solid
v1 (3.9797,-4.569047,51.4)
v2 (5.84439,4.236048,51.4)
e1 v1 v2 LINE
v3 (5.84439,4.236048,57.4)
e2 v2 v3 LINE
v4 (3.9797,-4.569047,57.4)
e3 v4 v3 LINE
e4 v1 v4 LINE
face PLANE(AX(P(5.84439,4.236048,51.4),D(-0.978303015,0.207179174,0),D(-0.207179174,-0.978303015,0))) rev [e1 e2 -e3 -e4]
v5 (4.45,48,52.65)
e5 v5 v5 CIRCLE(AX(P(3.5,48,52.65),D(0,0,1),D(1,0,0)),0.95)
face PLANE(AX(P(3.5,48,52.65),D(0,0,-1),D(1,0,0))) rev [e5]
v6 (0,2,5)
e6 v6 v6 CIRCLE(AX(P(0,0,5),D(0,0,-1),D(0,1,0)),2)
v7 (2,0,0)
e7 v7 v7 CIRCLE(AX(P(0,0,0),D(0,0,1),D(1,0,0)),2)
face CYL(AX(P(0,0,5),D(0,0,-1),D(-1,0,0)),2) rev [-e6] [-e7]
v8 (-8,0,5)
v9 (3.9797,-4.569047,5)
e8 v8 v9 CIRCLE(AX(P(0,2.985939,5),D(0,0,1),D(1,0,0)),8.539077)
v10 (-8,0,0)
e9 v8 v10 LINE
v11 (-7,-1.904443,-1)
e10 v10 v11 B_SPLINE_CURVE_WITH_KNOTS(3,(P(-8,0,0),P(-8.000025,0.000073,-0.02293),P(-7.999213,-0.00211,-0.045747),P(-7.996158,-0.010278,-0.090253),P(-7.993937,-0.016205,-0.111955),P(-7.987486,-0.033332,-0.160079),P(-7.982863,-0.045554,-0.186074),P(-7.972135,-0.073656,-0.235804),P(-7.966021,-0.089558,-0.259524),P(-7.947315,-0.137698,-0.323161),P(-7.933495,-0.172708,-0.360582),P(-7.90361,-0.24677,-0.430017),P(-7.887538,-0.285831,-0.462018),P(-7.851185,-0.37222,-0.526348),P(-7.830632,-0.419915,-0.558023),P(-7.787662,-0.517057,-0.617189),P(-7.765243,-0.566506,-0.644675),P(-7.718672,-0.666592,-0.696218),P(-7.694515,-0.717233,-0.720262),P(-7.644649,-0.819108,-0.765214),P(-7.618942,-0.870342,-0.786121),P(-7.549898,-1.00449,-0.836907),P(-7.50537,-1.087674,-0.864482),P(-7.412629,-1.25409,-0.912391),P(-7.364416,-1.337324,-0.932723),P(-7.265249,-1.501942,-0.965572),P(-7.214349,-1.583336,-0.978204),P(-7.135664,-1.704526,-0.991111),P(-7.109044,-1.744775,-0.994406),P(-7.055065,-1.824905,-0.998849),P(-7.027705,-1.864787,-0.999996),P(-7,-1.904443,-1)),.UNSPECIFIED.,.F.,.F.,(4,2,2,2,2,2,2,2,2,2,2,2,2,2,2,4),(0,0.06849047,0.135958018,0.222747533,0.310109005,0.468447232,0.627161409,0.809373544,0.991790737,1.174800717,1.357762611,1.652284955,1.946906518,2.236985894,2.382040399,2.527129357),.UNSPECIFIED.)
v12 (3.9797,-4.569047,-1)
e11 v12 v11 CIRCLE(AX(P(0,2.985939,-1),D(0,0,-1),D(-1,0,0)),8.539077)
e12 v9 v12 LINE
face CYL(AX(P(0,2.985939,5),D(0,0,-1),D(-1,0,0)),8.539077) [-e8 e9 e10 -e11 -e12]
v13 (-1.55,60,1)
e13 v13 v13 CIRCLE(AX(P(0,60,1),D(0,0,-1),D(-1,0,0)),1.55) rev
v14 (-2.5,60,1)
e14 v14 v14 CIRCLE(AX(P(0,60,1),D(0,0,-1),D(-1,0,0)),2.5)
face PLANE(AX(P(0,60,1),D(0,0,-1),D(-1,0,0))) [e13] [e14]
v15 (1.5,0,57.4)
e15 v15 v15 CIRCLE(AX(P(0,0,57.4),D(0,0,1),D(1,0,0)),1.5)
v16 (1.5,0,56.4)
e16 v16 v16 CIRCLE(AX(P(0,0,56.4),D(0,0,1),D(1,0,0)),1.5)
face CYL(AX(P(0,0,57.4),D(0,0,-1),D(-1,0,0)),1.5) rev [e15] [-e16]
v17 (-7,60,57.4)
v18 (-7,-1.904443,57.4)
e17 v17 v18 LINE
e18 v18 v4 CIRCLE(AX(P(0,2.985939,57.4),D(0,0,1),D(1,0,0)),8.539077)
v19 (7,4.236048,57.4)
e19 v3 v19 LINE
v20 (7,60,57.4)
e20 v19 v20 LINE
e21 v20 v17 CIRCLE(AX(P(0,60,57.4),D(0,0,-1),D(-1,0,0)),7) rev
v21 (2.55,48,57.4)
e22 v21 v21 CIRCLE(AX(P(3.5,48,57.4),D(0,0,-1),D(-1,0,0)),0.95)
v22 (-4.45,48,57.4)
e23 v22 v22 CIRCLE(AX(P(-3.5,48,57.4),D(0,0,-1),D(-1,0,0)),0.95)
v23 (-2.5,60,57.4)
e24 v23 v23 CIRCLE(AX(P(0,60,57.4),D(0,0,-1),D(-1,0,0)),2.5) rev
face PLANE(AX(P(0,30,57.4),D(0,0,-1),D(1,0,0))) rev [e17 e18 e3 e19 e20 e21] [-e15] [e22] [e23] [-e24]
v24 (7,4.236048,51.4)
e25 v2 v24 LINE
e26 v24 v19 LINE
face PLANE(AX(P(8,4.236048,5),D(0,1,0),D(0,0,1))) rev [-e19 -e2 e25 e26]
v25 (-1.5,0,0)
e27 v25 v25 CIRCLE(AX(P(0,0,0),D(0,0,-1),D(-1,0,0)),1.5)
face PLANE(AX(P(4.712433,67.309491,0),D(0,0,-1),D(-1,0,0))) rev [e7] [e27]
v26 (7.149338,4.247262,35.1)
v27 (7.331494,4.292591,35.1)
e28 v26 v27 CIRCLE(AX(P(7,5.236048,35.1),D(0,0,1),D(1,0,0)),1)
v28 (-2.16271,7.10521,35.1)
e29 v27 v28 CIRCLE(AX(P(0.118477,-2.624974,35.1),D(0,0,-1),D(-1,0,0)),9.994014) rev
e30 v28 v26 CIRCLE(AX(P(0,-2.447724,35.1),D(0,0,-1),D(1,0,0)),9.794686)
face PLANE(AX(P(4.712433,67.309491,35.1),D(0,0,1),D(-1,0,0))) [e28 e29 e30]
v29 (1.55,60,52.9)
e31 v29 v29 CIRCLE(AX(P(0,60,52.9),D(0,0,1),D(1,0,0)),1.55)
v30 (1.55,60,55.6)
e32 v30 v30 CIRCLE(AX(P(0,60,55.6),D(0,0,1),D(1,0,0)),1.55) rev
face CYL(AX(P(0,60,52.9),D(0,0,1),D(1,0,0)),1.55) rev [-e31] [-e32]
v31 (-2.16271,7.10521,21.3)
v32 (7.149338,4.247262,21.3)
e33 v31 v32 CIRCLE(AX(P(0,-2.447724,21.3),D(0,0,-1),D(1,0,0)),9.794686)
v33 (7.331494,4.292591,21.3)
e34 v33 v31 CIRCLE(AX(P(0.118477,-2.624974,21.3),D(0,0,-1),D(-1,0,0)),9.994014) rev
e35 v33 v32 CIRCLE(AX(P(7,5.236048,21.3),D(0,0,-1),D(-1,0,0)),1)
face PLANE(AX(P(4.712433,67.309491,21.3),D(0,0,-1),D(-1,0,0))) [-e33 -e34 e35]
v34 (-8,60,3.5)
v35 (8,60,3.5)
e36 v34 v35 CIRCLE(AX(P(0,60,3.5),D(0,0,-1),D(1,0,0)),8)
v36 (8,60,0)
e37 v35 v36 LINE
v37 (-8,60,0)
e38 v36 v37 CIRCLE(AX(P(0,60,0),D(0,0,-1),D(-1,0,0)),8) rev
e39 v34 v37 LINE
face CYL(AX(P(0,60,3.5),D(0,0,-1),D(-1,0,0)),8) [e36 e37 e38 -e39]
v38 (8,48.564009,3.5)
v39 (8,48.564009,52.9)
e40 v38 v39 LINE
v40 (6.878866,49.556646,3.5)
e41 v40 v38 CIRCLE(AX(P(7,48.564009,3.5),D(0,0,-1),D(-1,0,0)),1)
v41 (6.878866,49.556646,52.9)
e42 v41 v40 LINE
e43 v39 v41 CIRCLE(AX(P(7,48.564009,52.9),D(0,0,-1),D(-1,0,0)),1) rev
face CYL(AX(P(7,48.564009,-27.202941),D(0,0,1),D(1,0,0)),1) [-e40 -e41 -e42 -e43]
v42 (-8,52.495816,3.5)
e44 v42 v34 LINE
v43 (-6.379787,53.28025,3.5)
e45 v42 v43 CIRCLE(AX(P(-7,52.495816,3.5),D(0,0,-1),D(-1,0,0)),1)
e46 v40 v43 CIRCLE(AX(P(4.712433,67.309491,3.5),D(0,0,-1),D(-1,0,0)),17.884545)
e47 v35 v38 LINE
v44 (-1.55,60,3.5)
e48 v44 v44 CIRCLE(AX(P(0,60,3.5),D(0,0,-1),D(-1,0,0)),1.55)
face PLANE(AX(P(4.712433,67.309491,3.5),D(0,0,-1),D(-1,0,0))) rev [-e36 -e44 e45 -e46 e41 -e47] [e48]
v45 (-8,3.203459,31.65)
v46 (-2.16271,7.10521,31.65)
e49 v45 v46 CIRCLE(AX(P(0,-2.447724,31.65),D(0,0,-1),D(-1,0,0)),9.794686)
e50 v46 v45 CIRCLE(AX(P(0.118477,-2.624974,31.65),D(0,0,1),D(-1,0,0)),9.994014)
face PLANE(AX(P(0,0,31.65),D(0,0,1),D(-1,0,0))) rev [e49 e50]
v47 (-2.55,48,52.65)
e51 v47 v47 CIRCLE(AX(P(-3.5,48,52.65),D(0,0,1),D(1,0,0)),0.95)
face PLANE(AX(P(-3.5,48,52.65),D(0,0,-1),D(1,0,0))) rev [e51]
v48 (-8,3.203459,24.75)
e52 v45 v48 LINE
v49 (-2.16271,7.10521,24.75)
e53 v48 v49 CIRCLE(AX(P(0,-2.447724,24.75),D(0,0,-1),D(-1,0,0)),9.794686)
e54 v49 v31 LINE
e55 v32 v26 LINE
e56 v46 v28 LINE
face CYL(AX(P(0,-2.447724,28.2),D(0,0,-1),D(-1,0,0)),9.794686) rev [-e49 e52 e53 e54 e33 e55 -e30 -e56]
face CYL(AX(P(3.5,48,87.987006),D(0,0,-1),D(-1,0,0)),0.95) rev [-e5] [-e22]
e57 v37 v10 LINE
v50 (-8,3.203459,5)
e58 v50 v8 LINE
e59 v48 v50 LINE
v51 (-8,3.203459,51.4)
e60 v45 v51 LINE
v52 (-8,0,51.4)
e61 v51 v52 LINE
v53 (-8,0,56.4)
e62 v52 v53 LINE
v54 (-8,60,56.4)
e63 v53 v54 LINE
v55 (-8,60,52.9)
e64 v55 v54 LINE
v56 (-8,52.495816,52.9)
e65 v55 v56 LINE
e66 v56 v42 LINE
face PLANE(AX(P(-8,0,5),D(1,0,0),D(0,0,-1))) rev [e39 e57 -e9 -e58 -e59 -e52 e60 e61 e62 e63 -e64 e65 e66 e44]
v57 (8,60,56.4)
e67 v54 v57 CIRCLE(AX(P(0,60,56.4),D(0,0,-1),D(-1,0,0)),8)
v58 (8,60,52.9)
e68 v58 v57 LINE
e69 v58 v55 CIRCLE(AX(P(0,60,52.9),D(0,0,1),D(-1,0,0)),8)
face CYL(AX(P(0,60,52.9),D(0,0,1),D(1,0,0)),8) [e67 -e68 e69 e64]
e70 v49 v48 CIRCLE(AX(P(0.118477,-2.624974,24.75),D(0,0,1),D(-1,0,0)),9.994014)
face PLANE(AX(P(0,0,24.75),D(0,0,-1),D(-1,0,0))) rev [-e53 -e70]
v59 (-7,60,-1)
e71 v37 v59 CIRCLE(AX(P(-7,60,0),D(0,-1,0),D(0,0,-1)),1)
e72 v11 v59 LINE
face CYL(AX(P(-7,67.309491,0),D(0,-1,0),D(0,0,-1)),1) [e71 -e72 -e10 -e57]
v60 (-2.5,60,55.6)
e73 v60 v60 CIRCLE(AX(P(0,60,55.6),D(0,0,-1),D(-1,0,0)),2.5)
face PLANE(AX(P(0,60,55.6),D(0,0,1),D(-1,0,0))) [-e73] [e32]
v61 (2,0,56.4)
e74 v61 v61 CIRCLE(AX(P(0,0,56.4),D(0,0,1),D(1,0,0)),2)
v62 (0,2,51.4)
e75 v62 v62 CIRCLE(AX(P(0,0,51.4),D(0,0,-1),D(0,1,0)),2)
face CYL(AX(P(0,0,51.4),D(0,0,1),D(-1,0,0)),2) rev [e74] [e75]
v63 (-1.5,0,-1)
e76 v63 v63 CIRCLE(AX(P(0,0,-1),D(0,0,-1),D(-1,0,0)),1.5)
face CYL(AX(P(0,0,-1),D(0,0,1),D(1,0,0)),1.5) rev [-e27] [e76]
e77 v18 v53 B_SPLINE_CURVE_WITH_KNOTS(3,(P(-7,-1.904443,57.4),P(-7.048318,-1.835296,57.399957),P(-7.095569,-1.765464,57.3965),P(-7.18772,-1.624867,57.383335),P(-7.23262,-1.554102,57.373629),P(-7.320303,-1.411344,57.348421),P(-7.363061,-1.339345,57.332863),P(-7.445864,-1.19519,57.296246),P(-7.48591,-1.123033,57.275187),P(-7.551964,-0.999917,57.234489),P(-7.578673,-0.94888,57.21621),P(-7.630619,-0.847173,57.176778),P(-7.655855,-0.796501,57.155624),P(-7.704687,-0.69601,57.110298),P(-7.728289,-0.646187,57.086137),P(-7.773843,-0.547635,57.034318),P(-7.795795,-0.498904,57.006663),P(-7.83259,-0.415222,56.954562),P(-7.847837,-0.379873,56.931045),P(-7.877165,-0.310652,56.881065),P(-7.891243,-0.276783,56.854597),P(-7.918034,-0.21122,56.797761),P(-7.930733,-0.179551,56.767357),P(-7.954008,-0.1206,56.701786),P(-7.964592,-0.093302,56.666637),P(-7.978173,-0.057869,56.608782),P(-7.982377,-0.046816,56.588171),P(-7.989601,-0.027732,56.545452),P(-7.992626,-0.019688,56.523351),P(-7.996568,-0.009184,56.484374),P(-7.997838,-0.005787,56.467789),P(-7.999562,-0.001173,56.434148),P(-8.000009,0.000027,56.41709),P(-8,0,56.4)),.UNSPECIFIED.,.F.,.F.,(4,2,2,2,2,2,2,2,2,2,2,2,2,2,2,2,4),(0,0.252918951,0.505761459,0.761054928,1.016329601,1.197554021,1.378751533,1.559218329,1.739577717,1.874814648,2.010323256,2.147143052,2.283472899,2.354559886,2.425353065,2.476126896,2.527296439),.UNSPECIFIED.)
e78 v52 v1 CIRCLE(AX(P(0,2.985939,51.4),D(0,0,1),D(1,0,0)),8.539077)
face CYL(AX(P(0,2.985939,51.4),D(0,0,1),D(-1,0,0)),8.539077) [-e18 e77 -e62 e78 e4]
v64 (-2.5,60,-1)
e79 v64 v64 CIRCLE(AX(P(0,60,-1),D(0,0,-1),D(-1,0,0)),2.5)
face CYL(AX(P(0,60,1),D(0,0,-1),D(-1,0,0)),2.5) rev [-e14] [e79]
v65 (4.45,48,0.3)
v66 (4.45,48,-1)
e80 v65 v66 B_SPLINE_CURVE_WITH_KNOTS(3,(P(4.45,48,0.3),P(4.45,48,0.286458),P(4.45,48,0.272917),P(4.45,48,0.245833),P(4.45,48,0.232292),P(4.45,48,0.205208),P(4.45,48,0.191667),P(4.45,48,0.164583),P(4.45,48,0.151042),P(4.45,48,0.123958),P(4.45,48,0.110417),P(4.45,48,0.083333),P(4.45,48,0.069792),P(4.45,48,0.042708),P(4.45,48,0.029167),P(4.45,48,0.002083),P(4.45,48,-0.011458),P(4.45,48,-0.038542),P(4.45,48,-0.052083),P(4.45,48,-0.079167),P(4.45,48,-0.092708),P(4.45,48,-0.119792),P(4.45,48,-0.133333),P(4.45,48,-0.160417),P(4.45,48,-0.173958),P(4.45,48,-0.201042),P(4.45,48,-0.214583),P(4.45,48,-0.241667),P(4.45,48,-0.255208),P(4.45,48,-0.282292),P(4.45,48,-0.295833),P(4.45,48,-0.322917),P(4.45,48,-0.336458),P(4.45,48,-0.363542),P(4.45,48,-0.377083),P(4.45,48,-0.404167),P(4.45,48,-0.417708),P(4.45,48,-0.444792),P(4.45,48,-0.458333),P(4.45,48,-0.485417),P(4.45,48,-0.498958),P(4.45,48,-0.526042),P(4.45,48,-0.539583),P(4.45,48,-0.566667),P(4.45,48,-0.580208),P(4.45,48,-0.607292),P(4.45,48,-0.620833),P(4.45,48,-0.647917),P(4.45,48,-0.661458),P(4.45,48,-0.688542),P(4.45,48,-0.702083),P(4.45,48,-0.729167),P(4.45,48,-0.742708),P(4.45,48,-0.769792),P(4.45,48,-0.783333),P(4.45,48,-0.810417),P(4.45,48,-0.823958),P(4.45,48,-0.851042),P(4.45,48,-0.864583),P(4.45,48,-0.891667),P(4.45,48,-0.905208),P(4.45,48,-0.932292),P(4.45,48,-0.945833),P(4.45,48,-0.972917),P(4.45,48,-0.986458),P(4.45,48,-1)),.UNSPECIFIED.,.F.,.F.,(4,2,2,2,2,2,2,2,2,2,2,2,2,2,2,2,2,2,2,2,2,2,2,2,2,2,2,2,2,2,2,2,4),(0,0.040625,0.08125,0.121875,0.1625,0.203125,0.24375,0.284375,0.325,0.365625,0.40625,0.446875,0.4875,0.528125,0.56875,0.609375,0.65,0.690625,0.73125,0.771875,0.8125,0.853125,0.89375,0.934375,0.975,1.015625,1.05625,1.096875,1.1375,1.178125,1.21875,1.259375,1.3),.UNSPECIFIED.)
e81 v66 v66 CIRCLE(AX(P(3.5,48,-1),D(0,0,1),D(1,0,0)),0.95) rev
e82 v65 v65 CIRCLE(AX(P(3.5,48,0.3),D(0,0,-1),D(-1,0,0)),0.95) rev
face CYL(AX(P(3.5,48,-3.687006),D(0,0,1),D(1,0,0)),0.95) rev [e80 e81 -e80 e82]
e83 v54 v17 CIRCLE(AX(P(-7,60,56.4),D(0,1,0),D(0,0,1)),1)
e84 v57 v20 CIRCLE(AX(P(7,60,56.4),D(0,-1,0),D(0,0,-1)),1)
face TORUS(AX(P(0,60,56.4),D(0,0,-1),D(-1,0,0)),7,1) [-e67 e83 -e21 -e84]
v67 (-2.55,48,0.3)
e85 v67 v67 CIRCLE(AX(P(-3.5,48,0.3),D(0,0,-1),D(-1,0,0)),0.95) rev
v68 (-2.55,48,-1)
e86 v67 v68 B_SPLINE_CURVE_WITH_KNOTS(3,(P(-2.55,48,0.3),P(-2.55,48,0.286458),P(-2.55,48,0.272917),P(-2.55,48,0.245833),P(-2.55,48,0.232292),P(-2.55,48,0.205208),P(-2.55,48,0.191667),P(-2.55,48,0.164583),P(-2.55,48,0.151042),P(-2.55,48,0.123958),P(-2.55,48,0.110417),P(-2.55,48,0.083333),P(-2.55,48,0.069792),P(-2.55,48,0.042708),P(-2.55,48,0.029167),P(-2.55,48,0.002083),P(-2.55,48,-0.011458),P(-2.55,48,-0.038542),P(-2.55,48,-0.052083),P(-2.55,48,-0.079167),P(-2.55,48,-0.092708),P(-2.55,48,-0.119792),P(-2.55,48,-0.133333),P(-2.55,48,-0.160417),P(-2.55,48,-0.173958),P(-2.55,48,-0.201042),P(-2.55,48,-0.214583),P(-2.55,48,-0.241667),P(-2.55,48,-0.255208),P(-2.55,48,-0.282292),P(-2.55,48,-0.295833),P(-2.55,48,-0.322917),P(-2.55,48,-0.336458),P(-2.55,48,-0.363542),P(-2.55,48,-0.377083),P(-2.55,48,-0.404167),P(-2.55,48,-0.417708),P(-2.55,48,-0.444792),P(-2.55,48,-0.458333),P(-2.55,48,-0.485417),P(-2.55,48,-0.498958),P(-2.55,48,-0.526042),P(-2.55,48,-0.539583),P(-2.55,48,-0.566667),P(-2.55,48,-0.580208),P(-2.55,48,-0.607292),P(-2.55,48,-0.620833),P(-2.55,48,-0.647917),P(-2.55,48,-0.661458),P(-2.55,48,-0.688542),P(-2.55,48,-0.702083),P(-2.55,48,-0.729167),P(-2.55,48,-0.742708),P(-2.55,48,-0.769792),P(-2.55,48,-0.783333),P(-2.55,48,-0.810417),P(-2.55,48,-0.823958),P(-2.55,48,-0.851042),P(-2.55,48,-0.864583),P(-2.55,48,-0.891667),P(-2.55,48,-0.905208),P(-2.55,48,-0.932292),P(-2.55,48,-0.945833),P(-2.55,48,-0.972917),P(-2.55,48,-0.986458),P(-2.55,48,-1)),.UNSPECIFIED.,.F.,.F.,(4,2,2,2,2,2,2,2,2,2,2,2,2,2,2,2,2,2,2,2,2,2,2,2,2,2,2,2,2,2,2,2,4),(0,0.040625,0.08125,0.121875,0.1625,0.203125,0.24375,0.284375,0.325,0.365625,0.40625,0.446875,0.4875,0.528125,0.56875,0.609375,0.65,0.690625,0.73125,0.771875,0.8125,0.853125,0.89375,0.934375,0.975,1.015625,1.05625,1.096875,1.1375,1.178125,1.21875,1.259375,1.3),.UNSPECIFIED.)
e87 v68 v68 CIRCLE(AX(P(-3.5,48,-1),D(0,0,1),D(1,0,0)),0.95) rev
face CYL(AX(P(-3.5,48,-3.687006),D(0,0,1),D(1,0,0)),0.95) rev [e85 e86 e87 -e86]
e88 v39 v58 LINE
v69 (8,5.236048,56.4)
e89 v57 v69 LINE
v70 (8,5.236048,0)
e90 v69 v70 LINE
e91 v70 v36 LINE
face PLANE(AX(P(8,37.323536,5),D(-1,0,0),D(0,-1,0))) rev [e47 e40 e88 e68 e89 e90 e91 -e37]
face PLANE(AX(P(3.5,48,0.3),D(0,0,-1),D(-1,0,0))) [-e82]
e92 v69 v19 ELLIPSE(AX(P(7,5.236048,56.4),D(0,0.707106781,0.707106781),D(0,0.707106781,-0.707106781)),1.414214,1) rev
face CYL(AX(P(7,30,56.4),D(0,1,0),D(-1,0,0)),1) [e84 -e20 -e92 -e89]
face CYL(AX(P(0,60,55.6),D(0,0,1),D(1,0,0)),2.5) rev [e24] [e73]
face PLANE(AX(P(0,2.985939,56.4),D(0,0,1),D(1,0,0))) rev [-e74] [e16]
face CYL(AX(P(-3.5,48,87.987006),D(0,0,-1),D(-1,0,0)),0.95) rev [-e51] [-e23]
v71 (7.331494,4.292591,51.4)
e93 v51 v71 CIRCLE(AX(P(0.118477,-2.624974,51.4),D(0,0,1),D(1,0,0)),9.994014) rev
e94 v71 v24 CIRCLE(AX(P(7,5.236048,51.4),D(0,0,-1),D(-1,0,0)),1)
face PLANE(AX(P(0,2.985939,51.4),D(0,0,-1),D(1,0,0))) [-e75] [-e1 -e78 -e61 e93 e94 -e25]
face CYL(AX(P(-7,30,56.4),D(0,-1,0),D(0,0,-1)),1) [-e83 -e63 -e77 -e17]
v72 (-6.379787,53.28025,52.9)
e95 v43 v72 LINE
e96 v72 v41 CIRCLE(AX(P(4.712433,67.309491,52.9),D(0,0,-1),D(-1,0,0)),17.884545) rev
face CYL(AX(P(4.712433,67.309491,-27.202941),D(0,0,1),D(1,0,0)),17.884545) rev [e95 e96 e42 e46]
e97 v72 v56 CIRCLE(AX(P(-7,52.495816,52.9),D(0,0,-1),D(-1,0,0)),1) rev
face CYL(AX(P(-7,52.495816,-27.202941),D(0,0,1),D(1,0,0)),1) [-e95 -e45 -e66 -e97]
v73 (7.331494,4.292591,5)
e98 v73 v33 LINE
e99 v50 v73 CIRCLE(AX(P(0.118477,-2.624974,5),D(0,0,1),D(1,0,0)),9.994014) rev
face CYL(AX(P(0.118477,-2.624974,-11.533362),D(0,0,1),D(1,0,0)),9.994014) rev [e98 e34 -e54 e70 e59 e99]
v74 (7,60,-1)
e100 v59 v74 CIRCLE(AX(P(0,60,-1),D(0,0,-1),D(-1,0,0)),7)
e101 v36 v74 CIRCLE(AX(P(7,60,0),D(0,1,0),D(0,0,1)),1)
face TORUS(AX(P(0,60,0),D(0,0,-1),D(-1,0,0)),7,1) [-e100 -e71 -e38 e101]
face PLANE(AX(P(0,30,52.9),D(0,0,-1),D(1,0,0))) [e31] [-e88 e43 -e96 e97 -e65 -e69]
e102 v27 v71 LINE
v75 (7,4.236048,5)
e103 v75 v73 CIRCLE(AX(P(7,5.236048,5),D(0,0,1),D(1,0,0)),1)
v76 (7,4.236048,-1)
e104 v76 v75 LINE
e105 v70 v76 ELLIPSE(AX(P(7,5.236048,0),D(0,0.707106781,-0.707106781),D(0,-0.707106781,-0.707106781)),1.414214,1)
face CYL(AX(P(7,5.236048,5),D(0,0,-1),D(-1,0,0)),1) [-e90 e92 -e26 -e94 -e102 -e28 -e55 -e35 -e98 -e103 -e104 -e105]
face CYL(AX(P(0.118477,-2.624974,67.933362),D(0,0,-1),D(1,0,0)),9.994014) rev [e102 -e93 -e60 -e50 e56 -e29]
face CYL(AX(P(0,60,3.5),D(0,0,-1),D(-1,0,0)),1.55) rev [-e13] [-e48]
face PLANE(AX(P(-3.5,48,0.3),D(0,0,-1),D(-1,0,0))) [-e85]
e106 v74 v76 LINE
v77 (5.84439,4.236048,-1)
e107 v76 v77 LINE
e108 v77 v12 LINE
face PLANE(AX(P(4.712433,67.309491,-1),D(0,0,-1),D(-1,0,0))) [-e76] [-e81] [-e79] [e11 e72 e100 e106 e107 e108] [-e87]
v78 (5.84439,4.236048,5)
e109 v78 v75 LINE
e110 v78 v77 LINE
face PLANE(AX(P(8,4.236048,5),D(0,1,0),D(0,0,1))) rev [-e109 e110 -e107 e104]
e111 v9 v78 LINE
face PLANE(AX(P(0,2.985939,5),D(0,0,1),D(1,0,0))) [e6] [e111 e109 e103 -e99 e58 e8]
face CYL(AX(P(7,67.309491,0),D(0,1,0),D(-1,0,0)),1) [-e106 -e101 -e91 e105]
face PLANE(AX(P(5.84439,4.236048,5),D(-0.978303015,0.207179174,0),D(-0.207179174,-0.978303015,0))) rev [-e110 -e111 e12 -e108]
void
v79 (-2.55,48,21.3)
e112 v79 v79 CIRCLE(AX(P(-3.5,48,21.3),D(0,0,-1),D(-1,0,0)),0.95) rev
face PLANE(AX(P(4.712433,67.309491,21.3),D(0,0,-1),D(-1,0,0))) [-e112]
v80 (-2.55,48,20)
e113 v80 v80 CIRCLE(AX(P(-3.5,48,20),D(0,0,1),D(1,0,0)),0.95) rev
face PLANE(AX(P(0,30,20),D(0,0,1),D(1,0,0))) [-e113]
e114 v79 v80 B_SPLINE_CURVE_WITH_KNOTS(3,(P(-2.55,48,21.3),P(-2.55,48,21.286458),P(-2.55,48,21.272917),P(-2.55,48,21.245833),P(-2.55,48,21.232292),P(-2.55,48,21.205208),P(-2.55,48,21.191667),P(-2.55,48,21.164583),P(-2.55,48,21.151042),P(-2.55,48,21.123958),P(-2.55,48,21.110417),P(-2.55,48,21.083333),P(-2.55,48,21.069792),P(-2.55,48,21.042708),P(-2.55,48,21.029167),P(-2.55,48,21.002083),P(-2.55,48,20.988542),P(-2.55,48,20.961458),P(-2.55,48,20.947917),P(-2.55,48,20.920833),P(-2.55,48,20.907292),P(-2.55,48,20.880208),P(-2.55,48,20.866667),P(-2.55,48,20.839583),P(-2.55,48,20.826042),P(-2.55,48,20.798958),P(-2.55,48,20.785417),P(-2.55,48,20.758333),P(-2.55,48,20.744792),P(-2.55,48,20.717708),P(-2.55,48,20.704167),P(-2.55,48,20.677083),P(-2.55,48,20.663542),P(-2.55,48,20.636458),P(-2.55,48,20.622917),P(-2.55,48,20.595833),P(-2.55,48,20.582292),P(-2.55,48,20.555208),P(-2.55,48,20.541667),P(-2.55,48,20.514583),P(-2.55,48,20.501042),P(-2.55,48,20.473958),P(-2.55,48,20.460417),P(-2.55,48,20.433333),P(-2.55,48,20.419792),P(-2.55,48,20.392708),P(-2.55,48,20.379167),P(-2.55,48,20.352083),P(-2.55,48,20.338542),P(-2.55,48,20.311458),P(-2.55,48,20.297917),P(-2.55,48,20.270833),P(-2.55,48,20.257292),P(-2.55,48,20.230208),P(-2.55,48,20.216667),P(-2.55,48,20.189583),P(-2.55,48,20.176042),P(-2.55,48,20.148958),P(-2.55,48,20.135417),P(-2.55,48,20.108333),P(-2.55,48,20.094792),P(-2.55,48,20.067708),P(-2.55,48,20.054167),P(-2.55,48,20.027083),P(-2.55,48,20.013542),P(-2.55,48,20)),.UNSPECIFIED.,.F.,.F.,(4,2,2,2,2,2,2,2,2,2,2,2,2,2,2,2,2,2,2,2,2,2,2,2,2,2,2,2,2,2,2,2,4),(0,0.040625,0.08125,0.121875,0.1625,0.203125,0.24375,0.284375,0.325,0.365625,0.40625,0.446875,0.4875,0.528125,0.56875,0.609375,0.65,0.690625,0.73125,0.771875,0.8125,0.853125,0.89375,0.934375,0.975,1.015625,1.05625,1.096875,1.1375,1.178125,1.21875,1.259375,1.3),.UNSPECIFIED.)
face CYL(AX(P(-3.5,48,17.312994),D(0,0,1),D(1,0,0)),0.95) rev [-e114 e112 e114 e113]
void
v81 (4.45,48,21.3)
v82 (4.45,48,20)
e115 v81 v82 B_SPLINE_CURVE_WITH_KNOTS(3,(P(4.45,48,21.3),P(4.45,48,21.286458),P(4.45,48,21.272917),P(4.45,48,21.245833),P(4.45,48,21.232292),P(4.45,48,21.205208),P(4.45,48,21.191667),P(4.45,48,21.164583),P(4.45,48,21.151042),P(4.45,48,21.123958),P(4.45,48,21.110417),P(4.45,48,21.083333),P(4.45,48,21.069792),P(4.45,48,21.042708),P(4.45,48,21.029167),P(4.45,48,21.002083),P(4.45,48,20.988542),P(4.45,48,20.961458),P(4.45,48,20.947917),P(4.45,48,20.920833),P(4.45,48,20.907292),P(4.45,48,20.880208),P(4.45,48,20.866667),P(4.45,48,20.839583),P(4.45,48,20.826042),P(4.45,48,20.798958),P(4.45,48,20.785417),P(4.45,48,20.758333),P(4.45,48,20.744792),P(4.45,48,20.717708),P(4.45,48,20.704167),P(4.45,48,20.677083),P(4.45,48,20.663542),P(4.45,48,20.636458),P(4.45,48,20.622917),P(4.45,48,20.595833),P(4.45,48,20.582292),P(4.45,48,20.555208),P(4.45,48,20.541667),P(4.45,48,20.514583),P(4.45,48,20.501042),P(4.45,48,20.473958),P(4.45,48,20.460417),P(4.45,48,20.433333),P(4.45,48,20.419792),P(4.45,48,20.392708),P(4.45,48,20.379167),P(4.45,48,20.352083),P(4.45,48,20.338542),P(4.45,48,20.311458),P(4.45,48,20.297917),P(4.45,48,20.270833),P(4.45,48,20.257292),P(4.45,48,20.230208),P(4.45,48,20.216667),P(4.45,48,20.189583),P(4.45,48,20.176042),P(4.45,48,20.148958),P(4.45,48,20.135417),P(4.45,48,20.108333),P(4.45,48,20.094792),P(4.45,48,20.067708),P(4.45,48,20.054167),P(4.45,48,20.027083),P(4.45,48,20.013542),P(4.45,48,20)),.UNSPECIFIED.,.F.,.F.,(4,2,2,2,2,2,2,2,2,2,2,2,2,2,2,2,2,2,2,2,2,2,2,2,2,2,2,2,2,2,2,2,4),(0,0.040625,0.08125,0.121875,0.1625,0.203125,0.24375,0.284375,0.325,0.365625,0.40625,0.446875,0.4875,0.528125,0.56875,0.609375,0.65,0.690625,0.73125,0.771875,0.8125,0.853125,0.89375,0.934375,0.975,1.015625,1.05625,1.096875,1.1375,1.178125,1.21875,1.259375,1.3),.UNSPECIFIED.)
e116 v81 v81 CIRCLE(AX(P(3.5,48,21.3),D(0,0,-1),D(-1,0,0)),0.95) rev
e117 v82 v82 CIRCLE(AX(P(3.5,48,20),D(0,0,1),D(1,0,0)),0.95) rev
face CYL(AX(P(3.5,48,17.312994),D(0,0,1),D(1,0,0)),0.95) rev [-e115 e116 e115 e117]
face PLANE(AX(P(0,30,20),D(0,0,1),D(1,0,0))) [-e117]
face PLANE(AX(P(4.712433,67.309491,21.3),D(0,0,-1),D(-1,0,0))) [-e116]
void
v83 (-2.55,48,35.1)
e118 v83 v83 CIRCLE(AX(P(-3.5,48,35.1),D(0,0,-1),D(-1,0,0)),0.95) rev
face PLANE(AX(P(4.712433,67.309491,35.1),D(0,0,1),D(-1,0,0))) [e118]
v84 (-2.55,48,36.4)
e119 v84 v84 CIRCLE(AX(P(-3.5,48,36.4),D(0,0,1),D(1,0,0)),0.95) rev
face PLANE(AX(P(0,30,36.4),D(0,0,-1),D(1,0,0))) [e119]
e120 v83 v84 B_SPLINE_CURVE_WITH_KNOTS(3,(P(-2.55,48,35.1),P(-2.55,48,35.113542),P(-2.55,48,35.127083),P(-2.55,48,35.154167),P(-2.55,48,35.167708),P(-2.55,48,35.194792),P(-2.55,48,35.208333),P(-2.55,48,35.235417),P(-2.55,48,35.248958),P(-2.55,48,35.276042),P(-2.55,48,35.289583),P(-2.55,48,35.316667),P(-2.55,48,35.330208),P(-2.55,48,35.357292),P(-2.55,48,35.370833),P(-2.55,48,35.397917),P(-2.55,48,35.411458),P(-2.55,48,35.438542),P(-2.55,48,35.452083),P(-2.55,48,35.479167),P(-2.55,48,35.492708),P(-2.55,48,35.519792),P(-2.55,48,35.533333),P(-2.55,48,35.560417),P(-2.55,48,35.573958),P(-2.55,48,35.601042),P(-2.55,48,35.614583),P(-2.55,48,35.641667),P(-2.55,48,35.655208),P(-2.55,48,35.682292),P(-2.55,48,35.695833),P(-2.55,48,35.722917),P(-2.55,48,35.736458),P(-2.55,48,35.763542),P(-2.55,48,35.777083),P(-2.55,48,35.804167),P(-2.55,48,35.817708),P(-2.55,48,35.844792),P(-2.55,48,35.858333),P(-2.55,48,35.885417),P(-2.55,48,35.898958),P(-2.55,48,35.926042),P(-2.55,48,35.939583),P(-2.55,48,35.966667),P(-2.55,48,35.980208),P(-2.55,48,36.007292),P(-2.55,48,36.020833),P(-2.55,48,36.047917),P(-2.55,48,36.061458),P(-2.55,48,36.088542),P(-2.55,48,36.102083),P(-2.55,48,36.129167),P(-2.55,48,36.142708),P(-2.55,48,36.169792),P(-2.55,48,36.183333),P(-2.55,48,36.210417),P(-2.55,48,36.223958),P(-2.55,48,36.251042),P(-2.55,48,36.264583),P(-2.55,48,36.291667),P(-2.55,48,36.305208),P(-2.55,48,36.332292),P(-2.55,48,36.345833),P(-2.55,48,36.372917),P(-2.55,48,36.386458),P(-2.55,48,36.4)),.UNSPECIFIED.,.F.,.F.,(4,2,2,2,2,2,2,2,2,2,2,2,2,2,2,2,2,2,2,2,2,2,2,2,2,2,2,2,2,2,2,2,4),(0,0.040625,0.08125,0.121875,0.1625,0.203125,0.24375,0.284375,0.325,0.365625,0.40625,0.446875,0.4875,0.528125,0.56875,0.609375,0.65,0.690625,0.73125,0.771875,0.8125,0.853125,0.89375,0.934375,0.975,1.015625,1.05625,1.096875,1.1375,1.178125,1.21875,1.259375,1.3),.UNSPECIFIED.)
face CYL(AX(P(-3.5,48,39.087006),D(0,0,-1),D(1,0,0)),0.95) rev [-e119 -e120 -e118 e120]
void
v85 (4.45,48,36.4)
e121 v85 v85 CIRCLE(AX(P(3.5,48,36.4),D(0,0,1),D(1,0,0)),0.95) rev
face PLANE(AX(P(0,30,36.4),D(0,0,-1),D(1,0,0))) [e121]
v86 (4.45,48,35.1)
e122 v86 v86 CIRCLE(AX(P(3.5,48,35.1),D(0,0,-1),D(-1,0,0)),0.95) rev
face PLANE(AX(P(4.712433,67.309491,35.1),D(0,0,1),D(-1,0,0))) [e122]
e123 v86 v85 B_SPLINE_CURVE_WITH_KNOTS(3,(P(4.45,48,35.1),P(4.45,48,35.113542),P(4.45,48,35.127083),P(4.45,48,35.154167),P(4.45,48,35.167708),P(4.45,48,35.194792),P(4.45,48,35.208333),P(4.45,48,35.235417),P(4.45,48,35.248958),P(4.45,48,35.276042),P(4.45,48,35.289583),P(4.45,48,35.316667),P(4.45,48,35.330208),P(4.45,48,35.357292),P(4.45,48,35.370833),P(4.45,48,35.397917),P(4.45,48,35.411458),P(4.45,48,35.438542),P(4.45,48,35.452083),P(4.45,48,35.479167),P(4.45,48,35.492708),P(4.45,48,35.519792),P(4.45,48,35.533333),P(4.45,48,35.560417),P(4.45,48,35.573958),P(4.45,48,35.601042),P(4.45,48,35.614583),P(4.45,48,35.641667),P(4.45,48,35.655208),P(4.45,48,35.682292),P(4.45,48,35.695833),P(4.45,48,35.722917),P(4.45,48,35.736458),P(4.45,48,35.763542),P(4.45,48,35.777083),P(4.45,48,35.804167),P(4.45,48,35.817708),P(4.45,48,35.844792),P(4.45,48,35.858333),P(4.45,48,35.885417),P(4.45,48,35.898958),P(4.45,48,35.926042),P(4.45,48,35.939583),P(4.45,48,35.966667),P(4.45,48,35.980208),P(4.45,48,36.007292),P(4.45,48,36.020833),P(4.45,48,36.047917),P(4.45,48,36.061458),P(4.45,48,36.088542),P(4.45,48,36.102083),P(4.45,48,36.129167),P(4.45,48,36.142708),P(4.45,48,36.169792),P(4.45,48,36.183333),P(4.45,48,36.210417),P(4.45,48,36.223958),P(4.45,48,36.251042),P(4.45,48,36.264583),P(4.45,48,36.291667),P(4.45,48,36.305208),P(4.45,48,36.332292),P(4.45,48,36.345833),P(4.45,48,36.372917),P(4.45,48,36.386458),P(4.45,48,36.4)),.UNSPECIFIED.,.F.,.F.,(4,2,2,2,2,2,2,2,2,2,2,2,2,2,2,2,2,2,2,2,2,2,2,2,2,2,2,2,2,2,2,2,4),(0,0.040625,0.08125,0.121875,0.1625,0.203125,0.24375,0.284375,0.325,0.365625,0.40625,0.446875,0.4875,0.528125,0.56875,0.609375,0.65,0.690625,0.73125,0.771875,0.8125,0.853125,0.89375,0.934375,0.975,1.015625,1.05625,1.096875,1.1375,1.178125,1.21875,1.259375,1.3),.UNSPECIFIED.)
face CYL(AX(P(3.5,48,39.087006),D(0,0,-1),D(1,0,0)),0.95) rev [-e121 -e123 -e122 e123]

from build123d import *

# Parameters (mm, degrees)
SKETCH1_R                = 2
BOSS_EXTRUDE1_DEPTH      = 5
SKETCH2_R                = 1.5
BOSS_EXTRUDE2_DEPTH      = 15
SKETCH3_R                = 1.5
BOSS_EXTRUDE3_DEPTH      = 19.75
CROQUIS1_R               = 1.55
SALIENTE_EXTRUIR1_DEPTH  = 4.5
SALIENTE_EXTRUIR5_REACH  = 73.33
CROQUIS5_W               = 16
CROQUIS5_H               = 35.719654706
SALIENTE_EXTRUIR6_DEPTH  = 24.75
CROQUIS6_W               = 21.702147556
CROQUIS6_H               = 9.928090966
CORTAR_EXTRUIR1_DEPTH    = 13
CORTAR_EXTRUIR2_DEPTH    = 19.75
CROQUIS8_R               = 0.95
CORTAR_EXTRUIR3_DEPTH    = 4.75
SALIENTE_EXTRUIR7_DEPTH  = 3.45
CORTAR_EXTRUIR4_DEPTH    = 3
CORTAR_EXTRUIR5_DEPTH    = 16.5
CROQUIS14_R              = 1.5
SALIENTE_EXTRUIR8_DEPTH  = 1
SIMETR_A5_START          = -1
SIMETR_A5_OUTLINE_R      = 0.95
SIMETR_A5_DEPTH          = 1.3
SALIENTE_EXTRUIR9_START  = -4.5
CROQUIS15_R              = 1.55
SALIENTE_EXTRUIR9_DEPTH  = 4.5
SALIENTE_EXTRUIR10_START = 1
CROQUIS16_R              = 1.55
CROQUIS16_R_2            = 0.95
CROQUIS16_R_3            = 1.5
SALIENTE_EXTRUIR10_DEPTH = 1
CROQUIS17_R              = 2.5
CORTAR_EXTRUIR7_DEPTH    = 2
REDONDEO6_R              = 1
REDONDEO7_R              = 1
REDONDEO8_R              = 1


# Read off the part's stored shape, not the designer's step: Simetría5
with BuildPart() as part:
    # Sketch1 → Boss-Extrude1 (new body)
    with BuildSketch(Plane.XY):
        with BuildLine():
            Line((-8, 0), (-8, 37.32353581))
            Line((-8, 37.32353581), (8, 37.32353581))
            Line((8, 37.32353581), (8, 4.236047978))
            Line((8, 4.236047978), (5.844390358, 4.236047978))
            Line((5.844390358, 4.236047978), (3.979699792, -4.569047459))
            ThreePointArc((3.979699792, -4.569047459), (-3.04298408, -4.99253696), (-8, 0))
        make_face()
        Circle(SKETCH1_R, mode=Mode.SUBTRACT)
    extrude(amount=BOSS_EXTRUDE1_DEPTH)

    # Sketch2 → Boss-Extrude2 (add)
    with BuildSketch(Plane.XY.offset(5)):
        with Locations((0, 30)):
            Circle(SKETCH2_R)
    extrude(amount=BOSS_EXTRUDE2_DEPTH)

    # Sketch3 → Boss-Extrude3 (add)
    with BuildSketch(Plane.XY.offset(5)):
        with BuildLine():
            Line((-2.968624299, 23.290881231), (-2.968624299, 3.203458857))
            Line((-2.968624299, 3.203458857), (5, 3.203458857))
            Line((5, 3.203458857), (5, 0))
            ThreePointArc((5, 0), (3.535533906, -3.535533906), (0, -5))
            Line((0, -5), (-3, -5))
            Line((-3, -5), (-6.244997998, -5))
            ThreePointArc((-6.244997998, -5), (-7.548509256, -2.649529771), (-8, 0))
            Line((-8, 0), (-8, 30))
            Line((-8, 30), (-2.968624299, 23.290881231))
        make_face()
        Circle(SKETCH3_R, mode=Mode.SUBTRACT)
    extrude(amount=BOSS_EXTRUDE3_DEPTH)

    # Croquis1 → Saliente-Extruir1 (add)
    with BuildSketch(Plane.XY.offset(20)):
        with BuildLine():
            Line((8, 30), (8, 60))
            ThreePointArc((8, 60), (0, 68), (-8, 60))
            Line((-8, 60), (-8, 30))
            ThreePointArc((-8, 30), (0, 22), (8, 30))
        make_face()
        with Locations((0, 60)):
            Circle(CROQUIS1_R, mode=Mode.SUBTRACT)
    saliente_extruir1 = extrude(amount=SALIENTE_EXTRUIR1_DEPTH)

    # Saliente-Extruir5: up to this face of the body (flat: up to its plane)
    saliente_extruir5_end = Plane(part.part.faces().sort_by_distance((-0.202248034, 17.4746777, 0))[0])
    # Croquis4 → Saliente-Extruir5 (add, up to the picked face)
    with BuildSketch(Plane(origin=(0, 0, 20), x_dir=(-1, 0, 0), z_dir=(0, 0, -1)), mode=Mode.PRIVATE) as saliente_extruir5_sk1:
        with BuildLine():
            Line((8, 32.729705588), (8, 54.729705588))
            ThreePointArc((8, 54.729705588), (0.622079601, 50.239050865), (-8, 49.729705588))
            Line((-8, 49.729705588), (-8, 32.729705588))
            Line((-8, 32.729705588), (8, 32.729705588))
        make_face()
    saliente_extruir5_tool1 = split(extrude(saliente_extruir5_sk1.sketch, amount=SALIENTE_EXTRUIR5_REACH, mode=Mode.PRIVATE), bisect_by=saliente_extruir5_end, keep=Keep.BOTH, mode=Mode.PRIVATE)
    add(saliente_extruir5_tool1.solids().sort_by(Axis((-0.349387, 41.805362, 20), (0, 0, -1)))[0])

    # Croquis5 → Saliente-Extruir6 (add)
    with BuildSketch(Plane(origin=(0, 0, 0), x_dir=(-1, 0, 0), z_dir=(0, 0, -1))):
        with Locations((0, 22.095875331)):
            Rectangle(CROQUIS5_W, CROQUIS5_H)
    extrude(amount=-SALIENTE_EXTRUIR6_DEPTH)

    # Croquis6 → Cortar-Extruir1 (cut)
    with BuildSketch(Plane(origin=(5, 0, 0), x_dir=(0, 0, -1), z_dir=(1, 0, 0))):
        with Locations((-15.851073778, -1.760586626)):
            Rectangle(CROQUIS6_W, CROQUIS6_H)
    extrude(amount=-CORTAR_EXTRUIR1_DEPTH, mode=Mode.SUBTRACT)

    # Croquis7 → Cortar-Extruir2 (cut)
    with BuildSketch(Plane.XY.offset(24.75)):
        with BuildLine():
            Line((-8, 3.203458857), (8, 3.203458857))
            Line((8, 3.203458857), (8, 3.520097758))
            ThreePointArc((8, 3.520097758), (-0.079264703, 7.367082887), (-8, 3.203458857))
        make_face()
    extrude(amount=-CORTAR_EXTRUIR2_DEPTH, mode=Mode.SUBTRACT)

    # Croquis8 → Cortar-Extruir3 (cut)
    with BuildSketch(Plane.XY.offset(24.75)):
        with Locations((3.5, 48)):
            Circle(CROQUIS8_R)
        with Locations((-3.5, 48)):
            Circle(CROQUIS8_R)
    cortar_extruir3 = extrude(amount=-CORTAR_EXTRUIR3_DEPTH, mode=Mode.SUBTRACT)

    # Croquis9 → Saliente-Extruir7 (add, symmetric)
    with BuildSketch(Plane.XY.offset(24.75)):
        with BuildLine():
            Line((-8, 40.520097758), (-8, 3.203458857))
            ThreePointArc((-8, 3.203458857), (-0.665608426, 7.324319495), (7.159822628, 4.236047978))
            Line((7.159822628, 4.236047978), (8, 4.236047978))
            Line((8, 4.236047978), (8, 49.729705588))
            ThreePointArc((8, 49.729705588), (-0.622079601, 50.239050865), (-8, 54.729705588))
            Line((-8, 54.729705588), (-8, 40.520097758))
        make_face()
    extrude(amount=SALIENTE_EXTRUIR7_DEPTH, both=True)

    # Simetría1: part across plane


with BuildPart() as part_1:
    add(part.part)
    add(part.part.mirror(Plane(origin=(4.712433071, 67.309491417, 28.2), x_dir=(1, 0, 0), z_dir=(0, 0, -1))))

    # Croquis10 → Cortar-Extruir4 (cut)
    with BuildSketch(Plane(origin=(0, 0, 31.9), x_dir=(-1, 0, 0), z_dir=(0, 0, -1))):
        Polygon((2.51627812, 61.936924819), (-0.419287038, 63.147623185), (-2.935565159, 61.210698366), (-2.51627812, 58.063075181), (0.419287038, 56.852376815), (2.935565159, 58.789301634), align=None)
    extrude(amount=-CORTAR_EXTRUIR4_DEPTH, mode=Mode.SUBTRACT)

    # Simetría3: Saliente-Extruir1, Cortar-Extruir3 across plane
    add(saliente_extruir1.mirror(Plane.XY.offset(38.7)))
    add(cortar_extruir3.mirror(Plane.XY.offset(38.7)), mode=Mode.SUBTRACT)

    # Croquis12 → Cortar-Extruir5 (cut, symmetric)
    with BuildSketch(Plane.XY.offset(36.4)):
        with BuildLine():
            Line((-8, 54.729705588), (-10.312115974, 60.381035393))
            Line((-10.312115974, 60.381035393), (-8.568993542, 74.199141583))
            Line((-8.568993542, 74.199141583), (17.131520351, 70.957080647))
            Line((17.131520351, 70.957080647), (14.495741362, 50.062694062))
            Line((14.495741362, 50.062694062), (8, 49.729705588))
            ThreePointArc((8, 49.729705588), (-0.622079601, 50.239050865), (-8, 54.729705588))
        make_face()
    extrude(amount=CORTAR_EXTRUIR5_DEPTH, both=True, mode=Mode.SUBTRACT)

    # Croquis14 → Saliente-Extruir8 (add)
    with BuildSketch(Plane(origin=(0, 0, 0), x_dir=(-1, 0, 0), z_dir=(0, 0, -1))):
        with BuildLine():
            Line((-8, 49.729705588), (-8, 4.236047978))
            Line((-8, 4.236047978), (-5.844390358, 4.236047978))
            Line((-5.844390358, 4.236047978), (-3.979699792, -4.569047459))
            ThreePointArc((-3.979699792, -4.569047459), (3.04298408, -4.99253696), (8, 0))
            Line((8, 0), (8, 54.729705588))
            ThreePointArc((8, 54.729705588), (0.622079601, 50.239050865), (-8, 49.729705588))
        make_face()
        Circle(CROQUIS14_R, mode=Mode.SUBTRACT)
    extrude(amount=SALIENTE_EXTRUIR8_DEPTH)

    # Simetría5 outline → Simetría5 (cut)
    with BuildSketch(Plane.XY.offset(SIMETR_A5_START)):
        with Locations((-3.5, 48)):
            Circle(SIMETR_A5_OUTLINE_R)
        with Locations((3.5, 48)):
            Circle(SIMETR_A5_OUTLINE_R)
    extrude(amount=SIMETR_A5_DEPTH, mode=Mode.SUBTRACT)

    # Croquis15 → Saliente-Extruir9 (add)
    with BuildSketch(Plane(origin=(0, 0, -1), x_dir=(-1, 0, 0), z_dir=(0, 0, -1)).offset(SALIENTE_EXTRUIR9_START)):
        with BuildLine():
            Line((-8, 49.729705588), (-8, 60))
            ThreePointArc((-8, 60), (0, 68), (8, 60))
            Line((8, 60), (8, 54.729705588))
            ThreePointArc((8, 54.729705588), (0.622079601, 50.239050865), (-8, 49.729705588))
        make_face()
        with Locations(Location((0, 60, 0), (0, 0, 180))):
            Circle(CROQUIS15_R, mode=Mode.SUBTRACT)
    extrude(amount=SALIENTE_EXTRUIR9_DEPTH)

    # Croquis16 → Saliente-Extruir10 (add)
    with BuildSketch(Plane.XY.offset(56.4).offset(SALIENTE_EXTRUIR10_START)):
        with BuildLine():
            Line((-8, 0), (-8, 60))
            ThreePointArc((-8, 60), (0, 68), (8, 60))
            Line((8, 60), (8, 4.236047978))
            Line((8, 4.236047978), (5.844390358, 4.236047978))
            Line((5.844390358, 4.236047978), (3.979699792, -4.569047459))
            ThreePointArc((3.979699792, -4.569047459), (-3.04298408, -4.99253696), (-8, 0))
        make_face()
        with Locations((0, 60)):
            Circle(CROQUIS16_R, mode=Mode.SUBTRACT)
        with Locations(Location((3.5, 48, 0), (0, 0, 180))):
            Circle(CROQUIS16_R_2, mode=Mode.SUBTRACT)
        with Locations(Location((-3.5, 48, 0), (0, 0, 180))):
            Circle(CROQUIS16_R_2, mode=Mode.SUBTRACT)
        with Locations(Location((0, 0, 0), (0, 0, 180))):
            Circle(CROQUIS16_R_3, mode=Mode.SUBTRACT)
    extrude(amount=-SALIENTE_EXTRUIR10_DEPTH)

    # Croquis17 → Cortar-Extruir7 (cut)
    with BuildSketch(Plane(origin=(0, 0, -1), x_dir=(-1, 0, 0), z_dir=(0, 0, -1))):
        with Locations((0, 60)):
            Circle(CROQUIS17_R)
    cortar_extruir7 = extrude(amount=-CORTAR_EXTRUIR7_DEPTH, mode=Mode.SUBTRACT)

    # Simetría6: Cortar-Extruir7 across plane
    add(cortar_extruir7.mirror(Plane.XY.offset(28.3)), mode=Mode.SUBTRACT)

    # Redondeo6
    # the kernel refuses this fillet: 1 mm, written as the material it takes off along each edge
    with BuildSketch(Plane(origin=(-8, 60, -1), x_dir=(0, 0, 1), z_dir=(0, -1, 0)), Plane(origin=(-8, -2.5, 57.4), x_dir=(0, 0, -1), z_dir=(0, 1, 0))) as redondeo6_piece_1:
        with BuildLine():
            CenterArc((REDONDEO6_R, -REDONDEO6_R), REDONDEO6_R, 90, 90)
            Line((0, -REDONDEO6_R), (0, 0))
            Line((0, 0), (REDONDEO6_R, 0))
        make_face()
    extrude(amount=62.5, mode=Mode.SUBTRACT)
    with BuildSketch(Plane(origin=(0, 60, -1), x_dir=(1, 0, 0), z_dir=(0, -1, 0))) as redondeo6_piece_2:
        with BuildLine():
            CenterArc((8 - REDONDEO6_R, REDONDEO6_R), REDONDEO6_R, 270, 90)
            Line((8 - REDONDEO6_R, 0), (8, 0))
            Line((8, 0), (8, REDONDEO6_R))
        make_face()
    revolve(axis=Axis((0, 60, -1), (0, 0, 1)), revolution_arc=180, mode=Mode.SUBTRACT)
    with BuildSketch(Plane(origin=(8, 60, -1), x_dir=(-1, 0, 0), z_dir=(0, -1, 0))) as redondeo6_piece_3:
        with BuildLine():
            CenterArc((REDONDEO6_R, -REDONDEO6_R), REDONDEO6_R, 90, 90)
            Line((0, -REDONDEO6_R), (0, 0))
            Line((0, 0), (REDONDEO6_R, 0))
        make_face()
    extrude(amount=58.263952022, mode=Mode.SUBTRACT)
    with BuildSketch(Plane(origin=(8, 4.236047978, 59.9), x_dir=(0, 1, 0), z_dir=(0, 0, -1))) as redondeo6_piece_4:
        with BuildLine():
            CenterArc((REDONDEO6_R, -REDONDEO6_R), REDONDEO6_R, 90, 90)
            Line((0, -REDONDEO6_R), (0, 0))
            Line((0, 0), (REDONDEO6_R, 0))
        make_face()
    extrude(amount=63.4, mode=Mode.SUBTRACT)
    with BuildSketch(Plane(origin=(8, 60, 57.4), x_dir=(-1, 0, 0), z_dir=(0, -1, 0))) as redondeo6_piece_5:
        with BuildLine():
            CenterArc((REDONDEO6_R, REDONDEO6_R), REDONDEO6_R, 180, 90)
            Line((0, REDONDEO6_R), (0, 0))
            Line((0, 0), (REDONDEO6_R, 0))
        make_face()
    extrude(amount=58.263952022, mode=Mode.SUBTRACT)
    with BuildSketch(Plane(origin=(0, 60, 57.4), x_dir=(1, 0, 0), z_dir=(0, -1, 0))) as redondeo6_piece_6:
        with BuildLine():
            CenterArc((8 - REDONDEO6_R, -REDONDEO6_R), REDONDEO6_R, 0, 90)
            Line((8, -REDONDEO6_R), (8, 0))
            Line((8, 0), (8 - REDONDEO6_R, 0))
        make_face()
    revolve(axis=Axis((0, 60, 57.4), (0, 0, 1)), revolution_arc=180, mode=Mode.SUBTRACT)

    # Redondeo7
    redondeo7_edges = [part_1.edges().sort_by_distance(p)[0] for p in [
        (8, 49.729705588, 28.2),
    ]]
    fillet(redondeo7_edges, radius=REDONDEO7_R)

    # Redondeo8
    redondeo8_edges = [part_1.edges().sort_by_distance(p)[0] for p in [
        (-8, 54.729705588, 28.2),
    ]]
    fillet(redondeo8_edges, radius=REDONDEO8_R)


solid = part_1.part
